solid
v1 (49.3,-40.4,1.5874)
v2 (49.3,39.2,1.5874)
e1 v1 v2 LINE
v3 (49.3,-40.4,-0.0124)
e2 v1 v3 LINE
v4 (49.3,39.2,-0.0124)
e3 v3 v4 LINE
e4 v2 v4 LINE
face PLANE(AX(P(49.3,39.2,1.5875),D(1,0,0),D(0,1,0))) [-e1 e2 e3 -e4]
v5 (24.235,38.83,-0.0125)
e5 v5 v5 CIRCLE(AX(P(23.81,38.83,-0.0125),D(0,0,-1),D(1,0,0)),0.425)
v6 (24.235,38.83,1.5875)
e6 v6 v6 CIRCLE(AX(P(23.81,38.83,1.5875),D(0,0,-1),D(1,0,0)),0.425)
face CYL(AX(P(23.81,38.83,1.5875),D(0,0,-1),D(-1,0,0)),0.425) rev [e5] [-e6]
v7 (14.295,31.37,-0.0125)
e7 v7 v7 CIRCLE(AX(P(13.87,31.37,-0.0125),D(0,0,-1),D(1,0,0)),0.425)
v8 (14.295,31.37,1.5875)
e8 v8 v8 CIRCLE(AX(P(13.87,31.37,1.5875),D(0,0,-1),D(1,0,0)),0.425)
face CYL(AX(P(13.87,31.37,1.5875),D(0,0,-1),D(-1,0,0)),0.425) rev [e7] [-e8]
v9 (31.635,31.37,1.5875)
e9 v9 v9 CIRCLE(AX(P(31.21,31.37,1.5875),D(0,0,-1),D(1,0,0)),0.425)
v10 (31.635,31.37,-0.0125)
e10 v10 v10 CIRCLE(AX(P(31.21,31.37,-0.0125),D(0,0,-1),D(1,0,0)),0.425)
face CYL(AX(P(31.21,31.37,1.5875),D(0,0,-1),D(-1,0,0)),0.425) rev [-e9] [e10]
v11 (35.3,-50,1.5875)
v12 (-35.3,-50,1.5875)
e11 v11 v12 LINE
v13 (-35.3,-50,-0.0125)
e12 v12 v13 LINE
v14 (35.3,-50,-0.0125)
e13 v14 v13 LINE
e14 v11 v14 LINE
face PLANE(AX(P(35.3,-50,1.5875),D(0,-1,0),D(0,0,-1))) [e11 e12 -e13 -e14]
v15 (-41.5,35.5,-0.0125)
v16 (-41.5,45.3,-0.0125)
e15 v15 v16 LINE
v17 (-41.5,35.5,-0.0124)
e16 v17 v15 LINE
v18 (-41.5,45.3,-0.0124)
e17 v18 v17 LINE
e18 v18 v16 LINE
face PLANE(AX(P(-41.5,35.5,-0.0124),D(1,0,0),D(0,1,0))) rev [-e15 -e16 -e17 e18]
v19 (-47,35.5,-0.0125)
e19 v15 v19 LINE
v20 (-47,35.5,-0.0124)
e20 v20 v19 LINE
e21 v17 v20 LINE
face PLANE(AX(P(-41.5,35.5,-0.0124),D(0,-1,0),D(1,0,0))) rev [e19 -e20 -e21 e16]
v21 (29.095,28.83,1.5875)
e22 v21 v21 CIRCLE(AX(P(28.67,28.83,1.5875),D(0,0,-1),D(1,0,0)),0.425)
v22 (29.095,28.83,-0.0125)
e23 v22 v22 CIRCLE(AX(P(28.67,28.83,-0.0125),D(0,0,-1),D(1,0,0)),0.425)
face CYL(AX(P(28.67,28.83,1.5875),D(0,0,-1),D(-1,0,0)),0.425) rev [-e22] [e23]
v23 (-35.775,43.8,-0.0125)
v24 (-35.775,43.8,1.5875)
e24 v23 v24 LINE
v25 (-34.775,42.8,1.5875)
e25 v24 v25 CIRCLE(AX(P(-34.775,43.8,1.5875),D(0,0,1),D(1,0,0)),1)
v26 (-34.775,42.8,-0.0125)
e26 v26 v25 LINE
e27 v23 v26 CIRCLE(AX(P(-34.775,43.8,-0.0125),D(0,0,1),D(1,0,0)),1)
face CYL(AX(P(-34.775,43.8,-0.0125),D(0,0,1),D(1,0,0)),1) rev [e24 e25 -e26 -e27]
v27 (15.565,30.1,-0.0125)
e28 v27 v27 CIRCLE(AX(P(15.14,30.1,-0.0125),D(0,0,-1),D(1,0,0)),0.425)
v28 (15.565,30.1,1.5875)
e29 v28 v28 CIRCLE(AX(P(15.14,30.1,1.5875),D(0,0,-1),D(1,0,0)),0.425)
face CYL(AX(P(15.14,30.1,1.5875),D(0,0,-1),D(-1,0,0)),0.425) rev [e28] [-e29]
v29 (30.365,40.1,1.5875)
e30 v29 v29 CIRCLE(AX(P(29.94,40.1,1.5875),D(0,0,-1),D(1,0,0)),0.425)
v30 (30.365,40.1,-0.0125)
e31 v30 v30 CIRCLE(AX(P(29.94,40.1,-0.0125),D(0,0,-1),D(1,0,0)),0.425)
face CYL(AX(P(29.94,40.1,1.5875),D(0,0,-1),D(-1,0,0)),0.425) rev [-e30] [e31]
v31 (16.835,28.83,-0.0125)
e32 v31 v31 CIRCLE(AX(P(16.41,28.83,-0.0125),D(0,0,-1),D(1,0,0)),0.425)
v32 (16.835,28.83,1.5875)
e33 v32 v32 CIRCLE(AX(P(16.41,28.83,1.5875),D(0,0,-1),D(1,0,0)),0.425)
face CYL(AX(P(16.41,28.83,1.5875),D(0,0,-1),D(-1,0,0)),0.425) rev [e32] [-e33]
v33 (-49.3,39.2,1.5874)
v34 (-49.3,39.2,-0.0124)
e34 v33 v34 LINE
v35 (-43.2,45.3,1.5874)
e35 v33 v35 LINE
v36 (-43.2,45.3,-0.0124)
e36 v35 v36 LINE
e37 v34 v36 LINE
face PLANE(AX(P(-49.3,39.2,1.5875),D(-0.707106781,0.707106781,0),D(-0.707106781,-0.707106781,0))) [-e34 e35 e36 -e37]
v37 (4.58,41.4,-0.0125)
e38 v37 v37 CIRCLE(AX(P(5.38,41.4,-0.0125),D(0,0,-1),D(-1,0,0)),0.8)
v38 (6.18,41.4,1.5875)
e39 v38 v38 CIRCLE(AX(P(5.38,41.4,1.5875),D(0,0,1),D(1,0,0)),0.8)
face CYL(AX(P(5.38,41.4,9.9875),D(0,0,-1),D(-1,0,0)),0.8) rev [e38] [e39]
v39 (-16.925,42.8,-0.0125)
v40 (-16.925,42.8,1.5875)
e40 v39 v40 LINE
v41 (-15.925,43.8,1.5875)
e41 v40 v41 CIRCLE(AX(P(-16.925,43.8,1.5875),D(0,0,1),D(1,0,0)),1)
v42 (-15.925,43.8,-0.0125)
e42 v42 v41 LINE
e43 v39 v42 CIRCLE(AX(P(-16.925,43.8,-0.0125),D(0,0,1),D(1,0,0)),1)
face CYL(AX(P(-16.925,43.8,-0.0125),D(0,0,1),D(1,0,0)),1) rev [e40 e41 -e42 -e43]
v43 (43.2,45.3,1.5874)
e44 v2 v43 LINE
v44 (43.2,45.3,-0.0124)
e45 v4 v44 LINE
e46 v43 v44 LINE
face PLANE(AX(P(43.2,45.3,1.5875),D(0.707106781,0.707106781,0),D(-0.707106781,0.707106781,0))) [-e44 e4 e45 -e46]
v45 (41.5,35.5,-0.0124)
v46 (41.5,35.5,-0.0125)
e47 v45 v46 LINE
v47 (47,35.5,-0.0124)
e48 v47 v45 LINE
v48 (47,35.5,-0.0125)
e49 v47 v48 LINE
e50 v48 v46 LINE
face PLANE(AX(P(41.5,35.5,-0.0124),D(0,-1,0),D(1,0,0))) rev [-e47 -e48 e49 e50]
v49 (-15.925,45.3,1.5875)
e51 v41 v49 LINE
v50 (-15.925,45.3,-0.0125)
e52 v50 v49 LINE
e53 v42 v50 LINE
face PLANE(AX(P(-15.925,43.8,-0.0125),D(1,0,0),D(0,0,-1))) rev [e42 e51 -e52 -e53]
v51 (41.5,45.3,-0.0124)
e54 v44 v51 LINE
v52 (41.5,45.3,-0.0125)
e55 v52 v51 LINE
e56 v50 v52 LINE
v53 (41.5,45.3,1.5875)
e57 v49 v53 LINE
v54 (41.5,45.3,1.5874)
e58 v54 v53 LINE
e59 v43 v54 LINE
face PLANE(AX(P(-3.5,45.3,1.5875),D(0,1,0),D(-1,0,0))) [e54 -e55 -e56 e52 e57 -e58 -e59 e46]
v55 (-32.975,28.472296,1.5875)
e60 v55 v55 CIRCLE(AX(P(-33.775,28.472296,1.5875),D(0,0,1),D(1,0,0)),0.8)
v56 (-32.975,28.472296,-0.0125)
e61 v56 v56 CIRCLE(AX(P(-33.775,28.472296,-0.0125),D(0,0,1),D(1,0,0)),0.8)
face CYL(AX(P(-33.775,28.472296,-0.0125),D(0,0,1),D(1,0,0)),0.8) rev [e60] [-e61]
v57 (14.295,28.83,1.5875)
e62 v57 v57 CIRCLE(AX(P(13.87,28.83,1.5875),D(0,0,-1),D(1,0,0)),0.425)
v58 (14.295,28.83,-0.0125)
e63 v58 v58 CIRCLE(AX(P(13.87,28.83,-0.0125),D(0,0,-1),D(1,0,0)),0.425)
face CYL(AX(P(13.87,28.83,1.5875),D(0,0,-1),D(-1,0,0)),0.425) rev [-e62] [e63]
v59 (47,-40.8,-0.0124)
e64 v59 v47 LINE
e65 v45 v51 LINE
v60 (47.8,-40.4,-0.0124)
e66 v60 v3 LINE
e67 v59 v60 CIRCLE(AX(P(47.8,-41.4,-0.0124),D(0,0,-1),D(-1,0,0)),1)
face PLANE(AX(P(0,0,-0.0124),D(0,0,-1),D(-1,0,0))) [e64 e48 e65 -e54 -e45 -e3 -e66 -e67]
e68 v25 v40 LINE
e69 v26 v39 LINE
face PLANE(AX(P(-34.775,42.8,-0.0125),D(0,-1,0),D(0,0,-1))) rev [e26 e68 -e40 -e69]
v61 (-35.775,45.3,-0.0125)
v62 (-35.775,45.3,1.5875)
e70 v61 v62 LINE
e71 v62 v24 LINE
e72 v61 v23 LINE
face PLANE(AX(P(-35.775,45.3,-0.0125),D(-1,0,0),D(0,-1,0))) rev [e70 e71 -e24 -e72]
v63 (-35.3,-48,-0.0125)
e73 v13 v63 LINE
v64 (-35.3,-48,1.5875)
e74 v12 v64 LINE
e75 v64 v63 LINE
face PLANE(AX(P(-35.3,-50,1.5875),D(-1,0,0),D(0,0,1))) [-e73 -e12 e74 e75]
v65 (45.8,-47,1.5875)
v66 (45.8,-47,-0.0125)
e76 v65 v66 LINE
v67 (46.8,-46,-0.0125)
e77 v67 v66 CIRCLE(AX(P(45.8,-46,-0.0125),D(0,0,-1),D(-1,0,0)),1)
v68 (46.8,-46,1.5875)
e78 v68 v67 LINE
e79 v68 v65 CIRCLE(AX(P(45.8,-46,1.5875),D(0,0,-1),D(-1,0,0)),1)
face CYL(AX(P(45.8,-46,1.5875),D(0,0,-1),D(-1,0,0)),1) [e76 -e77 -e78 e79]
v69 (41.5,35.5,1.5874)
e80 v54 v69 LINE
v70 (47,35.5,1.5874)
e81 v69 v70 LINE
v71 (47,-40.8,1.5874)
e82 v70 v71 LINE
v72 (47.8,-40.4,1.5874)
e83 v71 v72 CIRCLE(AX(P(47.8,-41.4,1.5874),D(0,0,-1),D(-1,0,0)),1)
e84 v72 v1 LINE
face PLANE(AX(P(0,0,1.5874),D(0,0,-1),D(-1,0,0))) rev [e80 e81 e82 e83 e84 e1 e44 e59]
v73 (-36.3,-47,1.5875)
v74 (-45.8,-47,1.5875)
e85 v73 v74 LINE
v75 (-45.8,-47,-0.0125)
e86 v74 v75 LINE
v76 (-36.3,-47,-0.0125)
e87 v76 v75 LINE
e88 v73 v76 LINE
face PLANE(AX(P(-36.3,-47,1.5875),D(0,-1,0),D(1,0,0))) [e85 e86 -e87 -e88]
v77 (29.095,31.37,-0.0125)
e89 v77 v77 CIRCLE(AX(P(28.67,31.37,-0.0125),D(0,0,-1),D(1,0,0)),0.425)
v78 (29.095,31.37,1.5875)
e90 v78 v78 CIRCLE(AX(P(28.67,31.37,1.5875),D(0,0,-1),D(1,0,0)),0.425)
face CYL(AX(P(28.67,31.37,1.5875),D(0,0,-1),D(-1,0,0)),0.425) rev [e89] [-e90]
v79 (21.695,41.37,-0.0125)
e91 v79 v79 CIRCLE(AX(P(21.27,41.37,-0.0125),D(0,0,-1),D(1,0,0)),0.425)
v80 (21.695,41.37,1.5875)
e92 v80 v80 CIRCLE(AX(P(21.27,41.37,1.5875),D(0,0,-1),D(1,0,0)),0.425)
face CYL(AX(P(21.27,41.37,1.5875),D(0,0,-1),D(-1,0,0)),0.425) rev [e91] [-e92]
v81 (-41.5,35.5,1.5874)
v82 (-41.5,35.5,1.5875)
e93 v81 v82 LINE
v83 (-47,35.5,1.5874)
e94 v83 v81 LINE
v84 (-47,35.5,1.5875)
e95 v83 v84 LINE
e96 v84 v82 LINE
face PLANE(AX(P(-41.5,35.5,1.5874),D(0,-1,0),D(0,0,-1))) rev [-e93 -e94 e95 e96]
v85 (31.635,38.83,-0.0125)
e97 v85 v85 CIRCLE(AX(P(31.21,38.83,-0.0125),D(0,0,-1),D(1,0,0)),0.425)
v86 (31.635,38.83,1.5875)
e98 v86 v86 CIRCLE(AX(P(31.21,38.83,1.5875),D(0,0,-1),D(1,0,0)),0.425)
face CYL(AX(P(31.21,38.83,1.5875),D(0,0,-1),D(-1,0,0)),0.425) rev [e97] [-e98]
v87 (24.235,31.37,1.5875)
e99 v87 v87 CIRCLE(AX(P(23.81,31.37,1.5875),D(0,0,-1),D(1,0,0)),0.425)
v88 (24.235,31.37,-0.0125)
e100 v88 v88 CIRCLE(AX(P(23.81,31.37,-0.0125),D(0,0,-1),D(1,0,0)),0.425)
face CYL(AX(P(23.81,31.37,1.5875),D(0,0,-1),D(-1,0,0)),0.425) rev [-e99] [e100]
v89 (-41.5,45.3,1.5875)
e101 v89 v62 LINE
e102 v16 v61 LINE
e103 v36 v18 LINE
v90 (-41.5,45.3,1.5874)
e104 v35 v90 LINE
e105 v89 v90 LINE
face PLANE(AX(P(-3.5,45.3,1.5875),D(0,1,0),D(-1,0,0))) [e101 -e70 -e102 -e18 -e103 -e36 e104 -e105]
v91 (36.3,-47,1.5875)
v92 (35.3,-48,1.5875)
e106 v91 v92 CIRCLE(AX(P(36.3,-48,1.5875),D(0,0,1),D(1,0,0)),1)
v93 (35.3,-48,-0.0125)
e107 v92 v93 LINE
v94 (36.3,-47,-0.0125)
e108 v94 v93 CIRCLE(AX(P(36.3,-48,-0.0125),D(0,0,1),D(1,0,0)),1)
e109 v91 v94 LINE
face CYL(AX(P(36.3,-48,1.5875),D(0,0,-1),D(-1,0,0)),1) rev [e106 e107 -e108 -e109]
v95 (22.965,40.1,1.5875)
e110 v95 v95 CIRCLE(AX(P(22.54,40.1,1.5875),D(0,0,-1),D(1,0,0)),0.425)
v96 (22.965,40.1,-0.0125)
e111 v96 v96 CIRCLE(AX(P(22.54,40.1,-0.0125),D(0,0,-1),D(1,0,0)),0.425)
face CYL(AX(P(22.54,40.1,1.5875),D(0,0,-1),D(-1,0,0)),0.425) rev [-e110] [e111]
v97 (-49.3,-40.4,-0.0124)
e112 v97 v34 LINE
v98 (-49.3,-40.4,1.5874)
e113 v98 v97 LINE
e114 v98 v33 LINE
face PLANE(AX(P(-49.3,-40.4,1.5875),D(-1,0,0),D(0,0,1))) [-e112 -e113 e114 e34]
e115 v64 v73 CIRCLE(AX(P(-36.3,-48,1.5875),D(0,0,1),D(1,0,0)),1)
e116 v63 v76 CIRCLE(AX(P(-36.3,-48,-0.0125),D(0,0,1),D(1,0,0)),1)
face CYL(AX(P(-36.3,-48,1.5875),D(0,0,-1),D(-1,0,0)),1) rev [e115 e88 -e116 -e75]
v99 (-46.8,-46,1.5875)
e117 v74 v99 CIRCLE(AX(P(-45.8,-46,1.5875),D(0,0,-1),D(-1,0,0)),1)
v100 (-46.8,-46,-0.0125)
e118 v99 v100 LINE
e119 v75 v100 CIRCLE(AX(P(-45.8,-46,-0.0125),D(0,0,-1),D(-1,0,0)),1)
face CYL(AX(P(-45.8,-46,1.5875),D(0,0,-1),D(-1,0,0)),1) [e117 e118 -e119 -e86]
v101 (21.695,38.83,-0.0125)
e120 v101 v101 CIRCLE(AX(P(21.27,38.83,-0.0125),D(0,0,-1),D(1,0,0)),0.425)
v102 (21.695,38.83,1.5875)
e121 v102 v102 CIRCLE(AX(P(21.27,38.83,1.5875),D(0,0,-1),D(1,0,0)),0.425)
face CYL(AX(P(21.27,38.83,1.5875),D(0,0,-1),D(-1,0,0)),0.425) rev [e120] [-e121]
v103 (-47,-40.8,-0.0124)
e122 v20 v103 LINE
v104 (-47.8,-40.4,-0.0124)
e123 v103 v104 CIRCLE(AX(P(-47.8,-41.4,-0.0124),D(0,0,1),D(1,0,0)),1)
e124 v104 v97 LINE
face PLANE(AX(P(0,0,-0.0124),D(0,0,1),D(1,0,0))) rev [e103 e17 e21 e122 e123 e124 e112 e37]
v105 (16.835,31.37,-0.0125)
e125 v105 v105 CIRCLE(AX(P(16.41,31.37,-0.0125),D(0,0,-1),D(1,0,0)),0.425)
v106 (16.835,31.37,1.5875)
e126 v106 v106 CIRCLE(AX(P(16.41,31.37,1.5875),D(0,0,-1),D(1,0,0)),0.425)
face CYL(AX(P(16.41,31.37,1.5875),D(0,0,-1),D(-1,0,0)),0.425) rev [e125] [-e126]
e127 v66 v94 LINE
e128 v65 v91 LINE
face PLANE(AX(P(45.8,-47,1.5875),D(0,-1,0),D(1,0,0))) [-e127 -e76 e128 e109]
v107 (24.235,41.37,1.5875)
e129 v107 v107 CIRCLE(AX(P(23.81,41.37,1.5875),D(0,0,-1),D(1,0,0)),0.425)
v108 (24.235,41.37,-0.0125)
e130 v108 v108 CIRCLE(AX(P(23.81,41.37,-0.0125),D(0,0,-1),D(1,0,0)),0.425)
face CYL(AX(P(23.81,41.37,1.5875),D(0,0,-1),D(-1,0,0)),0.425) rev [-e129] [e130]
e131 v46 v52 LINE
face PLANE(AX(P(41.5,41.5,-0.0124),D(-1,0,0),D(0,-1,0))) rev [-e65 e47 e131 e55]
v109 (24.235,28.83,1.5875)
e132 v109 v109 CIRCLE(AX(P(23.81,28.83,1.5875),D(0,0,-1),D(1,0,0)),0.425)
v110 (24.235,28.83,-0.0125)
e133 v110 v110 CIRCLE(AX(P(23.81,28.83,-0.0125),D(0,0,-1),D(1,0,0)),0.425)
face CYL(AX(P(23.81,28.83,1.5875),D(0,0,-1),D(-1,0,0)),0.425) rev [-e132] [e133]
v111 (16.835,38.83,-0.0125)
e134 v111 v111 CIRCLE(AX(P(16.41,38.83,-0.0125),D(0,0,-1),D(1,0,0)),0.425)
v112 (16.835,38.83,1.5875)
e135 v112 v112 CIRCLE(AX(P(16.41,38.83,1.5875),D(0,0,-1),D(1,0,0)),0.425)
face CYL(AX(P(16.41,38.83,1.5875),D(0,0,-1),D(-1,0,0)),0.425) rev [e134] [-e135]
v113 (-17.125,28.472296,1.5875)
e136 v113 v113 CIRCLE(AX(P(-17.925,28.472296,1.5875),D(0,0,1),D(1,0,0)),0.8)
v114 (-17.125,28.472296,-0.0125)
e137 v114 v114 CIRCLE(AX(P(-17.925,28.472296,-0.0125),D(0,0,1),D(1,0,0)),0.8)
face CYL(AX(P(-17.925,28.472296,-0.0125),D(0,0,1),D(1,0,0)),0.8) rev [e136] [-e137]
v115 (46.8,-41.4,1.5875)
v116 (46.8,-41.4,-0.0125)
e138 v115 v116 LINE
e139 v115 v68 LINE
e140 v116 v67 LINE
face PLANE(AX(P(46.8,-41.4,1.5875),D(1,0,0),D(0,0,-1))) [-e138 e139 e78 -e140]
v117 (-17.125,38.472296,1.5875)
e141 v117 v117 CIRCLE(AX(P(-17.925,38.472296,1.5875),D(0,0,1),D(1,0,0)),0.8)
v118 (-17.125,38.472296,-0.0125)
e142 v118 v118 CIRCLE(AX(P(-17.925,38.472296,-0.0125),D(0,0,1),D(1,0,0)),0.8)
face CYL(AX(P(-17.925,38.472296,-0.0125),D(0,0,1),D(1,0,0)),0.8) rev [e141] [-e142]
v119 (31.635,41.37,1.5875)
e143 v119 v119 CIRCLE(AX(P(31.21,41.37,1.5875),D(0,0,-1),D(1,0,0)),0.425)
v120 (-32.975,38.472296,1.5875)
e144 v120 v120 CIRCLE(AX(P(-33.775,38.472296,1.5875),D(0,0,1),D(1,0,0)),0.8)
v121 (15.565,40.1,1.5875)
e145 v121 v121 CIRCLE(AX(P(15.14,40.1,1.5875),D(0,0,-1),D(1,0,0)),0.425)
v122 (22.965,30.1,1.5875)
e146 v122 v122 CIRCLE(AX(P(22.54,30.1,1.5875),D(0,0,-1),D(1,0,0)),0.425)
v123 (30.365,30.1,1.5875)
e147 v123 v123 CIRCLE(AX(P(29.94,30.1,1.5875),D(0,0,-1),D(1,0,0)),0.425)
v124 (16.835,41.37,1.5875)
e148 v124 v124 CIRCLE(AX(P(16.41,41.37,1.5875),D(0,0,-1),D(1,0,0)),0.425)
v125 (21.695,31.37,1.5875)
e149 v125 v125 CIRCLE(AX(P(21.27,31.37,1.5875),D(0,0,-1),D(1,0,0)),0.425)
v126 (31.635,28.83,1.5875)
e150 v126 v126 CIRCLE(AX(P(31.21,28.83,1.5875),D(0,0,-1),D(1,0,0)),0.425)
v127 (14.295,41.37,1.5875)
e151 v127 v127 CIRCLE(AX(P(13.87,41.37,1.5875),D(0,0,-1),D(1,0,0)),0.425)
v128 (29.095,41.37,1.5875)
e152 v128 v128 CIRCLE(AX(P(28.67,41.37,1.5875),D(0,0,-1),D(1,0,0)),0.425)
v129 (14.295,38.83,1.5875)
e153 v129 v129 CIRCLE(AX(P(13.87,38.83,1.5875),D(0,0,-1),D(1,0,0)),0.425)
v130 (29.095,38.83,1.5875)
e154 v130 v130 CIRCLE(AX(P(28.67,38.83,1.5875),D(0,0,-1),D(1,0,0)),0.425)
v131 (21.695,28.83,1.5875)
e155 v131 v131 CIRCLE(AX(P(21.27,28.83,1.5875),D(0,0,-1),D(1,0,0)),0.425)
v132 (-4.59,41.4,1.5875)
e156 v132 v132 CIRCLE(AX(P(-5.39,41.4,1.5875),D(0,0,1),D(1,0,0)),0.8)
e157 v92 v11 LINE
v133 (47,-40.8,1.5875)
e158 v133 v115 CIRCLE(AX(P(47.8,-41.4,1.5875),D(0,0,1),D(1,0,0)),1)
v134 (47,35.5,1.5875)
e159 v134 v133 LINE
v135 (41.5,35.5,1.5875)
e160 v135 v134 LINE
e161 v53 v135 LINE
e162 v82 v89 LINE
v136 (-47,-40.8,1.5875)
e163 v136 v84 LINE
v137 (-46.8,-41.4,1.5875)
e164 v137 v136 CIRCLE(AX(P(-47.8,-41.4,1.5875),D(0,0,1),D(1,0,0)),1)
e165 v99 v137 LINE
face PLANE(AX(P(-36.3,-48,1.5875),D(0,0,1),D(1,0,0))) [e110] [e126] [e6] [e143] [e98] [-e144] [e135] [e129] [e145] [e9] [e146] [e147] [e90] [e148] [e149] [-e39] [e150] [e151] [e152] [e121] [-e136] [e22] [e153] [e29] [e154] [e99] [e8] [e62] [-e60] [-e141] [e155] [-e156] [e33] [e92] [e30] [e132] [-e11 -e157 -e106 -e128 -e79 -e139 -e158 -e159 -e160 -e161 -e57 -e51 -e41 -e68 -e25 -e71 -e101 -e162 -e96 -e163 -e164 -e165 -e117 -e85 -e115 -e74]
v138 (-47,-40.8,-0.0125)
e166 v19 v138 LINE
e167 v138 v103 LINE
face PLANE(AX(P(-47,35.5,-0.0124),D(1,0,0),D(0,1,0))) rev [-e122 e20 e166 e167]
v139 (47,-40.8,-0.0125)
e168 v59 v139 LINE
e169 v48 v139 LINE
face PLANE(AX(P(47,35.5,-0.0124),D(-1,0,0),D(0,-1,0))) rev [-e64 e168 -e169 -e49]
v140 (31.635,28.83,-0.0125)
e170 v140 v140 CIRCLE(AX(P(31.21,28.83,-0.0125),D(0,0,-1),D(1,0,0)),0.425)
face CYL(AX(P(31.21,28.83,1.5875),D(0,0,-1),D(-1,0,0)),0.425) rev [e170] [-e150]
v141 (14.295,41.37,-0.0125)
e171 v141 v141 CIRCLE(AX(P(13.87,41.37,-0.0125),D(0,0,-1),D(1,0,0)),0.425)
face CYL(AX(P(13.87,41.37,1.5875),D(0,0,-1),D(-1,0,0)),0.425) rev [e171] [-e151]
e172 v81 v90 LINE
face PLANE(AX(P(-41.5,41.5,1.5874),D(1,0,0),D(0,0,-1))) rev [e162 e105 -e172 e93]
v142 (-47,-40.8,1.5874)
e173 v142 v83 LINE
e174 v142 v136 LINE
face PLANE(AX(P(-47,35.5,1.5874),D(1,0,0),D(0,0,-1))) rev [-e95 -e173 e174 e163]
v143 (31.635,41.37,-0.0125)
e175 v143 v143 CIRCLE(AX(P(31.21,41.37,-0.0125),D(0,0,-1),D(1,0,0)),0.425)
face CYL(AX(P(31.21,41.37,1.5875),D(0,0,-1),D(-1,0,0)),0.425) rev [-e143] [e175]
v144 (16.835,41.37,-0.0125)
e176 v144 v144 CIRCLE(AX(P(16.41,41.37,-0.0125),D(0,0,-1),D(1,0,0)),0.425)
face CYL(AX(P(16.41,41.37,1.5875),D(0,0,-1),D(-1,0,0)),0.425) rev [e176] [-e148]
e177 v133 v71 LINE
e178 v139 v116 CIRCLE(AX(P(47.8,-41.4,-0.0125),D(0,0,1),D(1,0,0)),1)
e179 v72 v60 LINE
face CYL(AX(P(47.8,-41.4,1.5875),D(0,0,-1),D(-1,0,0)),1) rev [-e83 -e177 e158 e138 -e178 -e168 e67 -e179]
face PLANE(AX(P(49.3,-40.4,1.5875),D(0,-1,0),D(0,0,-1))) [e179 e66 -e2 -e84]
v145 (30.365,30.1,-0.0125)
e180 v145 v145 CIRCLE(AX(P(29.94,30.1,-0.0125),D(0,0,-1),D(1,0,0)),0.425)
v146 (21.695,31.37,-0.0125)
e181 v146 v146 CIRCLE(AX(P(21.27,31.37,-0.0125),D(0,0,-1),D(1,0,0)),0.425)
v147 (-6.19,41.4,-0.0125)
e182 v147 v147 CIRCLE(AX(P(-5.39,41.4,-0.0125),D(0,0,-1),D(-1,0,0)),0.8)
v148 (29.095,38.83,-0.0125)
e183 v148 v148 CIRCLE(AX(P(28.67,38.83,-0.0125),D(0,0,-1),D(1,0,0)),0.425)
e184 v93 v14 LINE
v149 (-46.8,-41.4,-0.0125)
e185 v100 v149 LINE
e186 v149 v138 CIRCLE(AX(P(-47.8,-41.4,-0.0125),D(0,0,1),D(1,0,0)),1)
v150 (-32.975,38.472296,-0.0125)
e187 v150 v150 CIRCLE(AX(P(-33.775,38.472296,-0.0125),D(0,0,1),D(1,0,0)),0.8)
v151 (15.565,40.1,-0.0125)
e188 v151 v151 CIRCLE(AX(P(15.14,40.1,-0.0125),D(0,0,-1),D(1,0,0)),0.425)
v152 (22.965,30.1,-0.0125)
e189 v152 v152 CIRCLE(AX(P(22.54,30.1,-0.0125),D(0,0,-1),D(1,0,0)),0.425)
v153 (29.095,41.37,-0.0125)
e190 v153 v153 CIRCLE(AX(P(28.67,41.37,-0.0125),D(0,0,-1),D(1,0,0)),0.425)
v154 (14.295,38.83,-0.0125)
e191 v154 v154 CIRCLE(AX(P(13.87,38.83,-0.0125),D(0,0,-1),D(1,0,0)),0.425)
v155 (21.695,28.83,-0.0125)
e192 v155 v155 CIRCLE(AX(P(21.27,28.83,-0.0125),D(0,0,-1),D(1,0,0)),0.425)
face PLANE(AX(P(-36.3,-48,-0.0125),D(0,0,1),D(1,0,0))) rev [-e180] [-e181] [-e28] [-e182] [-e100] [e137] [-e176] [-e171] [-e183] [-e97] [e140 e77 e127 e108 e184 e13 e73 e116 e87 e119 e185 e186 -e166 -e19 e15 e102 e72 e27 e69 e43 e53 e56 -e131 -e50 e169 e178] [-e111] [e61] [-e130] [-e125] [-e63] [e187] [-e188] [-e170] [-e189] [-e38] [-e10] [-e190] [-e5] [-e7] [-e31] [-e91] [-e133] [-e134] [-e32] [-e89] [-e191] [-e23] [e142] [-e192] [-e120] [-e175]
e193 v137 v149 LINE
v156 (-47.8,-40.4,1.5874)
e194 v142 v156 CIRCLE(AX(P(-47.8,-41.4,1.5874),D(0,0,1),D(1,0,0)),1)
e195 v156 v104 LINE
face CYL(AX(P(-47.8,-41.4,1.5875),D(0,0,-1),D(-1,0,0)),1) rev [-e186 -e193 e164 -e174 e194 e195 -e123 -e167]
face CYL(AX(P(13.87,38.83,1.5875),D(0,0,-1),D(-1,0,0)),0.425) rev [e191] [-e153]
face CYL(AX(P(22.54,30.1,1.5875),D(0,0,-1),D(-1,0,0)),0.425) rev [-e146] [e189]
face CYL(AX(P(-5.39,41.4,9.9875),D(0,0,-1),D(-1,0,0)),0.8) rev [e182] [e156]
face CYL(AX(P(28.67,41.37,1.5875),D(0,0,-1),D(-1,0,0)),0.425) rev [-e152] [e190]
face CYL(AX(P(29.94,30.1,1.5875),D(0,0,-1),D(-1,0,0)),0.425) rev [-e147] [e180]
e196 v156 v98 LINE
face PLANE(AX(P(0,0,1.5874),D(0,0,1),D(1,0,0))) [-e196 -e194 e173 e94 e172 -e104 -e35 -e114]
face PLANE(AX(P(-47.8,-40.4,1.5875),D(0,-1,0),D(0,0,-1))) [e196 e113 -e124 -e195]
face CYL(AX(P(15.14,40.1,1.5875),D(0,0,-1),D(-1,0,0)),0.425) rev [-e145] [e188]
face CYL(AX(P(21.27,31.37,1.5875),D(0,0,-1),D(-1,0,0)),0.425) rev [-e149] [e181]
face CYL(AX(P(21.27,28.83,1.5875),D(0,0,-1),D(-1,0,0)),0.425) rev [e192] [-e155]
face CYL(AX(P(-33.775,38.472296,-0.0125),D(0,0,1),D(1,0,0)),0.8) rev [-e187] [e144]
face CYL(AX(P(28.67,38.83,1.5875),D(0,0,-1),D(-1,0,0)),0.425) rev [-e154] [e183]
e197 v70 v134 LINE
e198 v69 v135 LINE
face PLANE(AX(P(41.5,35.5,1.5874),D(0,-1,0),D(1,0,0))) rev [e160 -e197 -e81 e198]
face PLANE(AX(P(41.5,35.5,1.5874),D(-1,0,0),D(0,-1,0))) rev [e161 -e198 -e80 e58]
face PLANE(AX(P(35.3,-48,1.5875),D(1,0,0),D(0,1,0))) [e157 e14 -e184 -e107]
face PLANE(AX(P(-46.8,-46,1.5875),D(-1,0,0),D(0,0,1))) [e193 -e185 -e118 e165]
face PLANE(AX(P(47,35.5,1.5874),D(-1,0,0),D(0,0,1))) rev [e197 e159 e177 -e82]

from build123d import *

# Parameters (mm, degrees)
SKETCH1_R                = 0.425
BOSS_EXTRUDE1_DEPTH      = 1.6
LPATTERN2_START          = -0.0125
LPATTERN2_OUTLINE_R      = 0.425
LPATTERN2_DEPTH          = 1.6
SLOTFOOTPRINTS_REF_DEPTH = 0.0001
SLOTFOOTPRINTS_DEPTH     = 0.0001
SKETCH2_R                = 0.8
F_20PIN_MOUNTS_DEPTH     = 71.235674696
SKETCH3_R                = 0.8
F_12PIN_MOUNTS_DEPTH     = 10


# Read off the part's stored shape, not the designer's step: LPattern2
with BuildPart() as part:
    # Sketch1 → Boss-Extrude1 (new body)
    with BuildSketch(Plane(origin=(0, 0, -0.0125), x_dir=(-1, 0, 0), z_dir=(0, 0, -1))):
        with BuildLine():
            Line((35.3, -50), (35.3, -48))
            ThreePointArc((35.3, -48), (35.592893219, -47.292893219), (36.3, -47))
            Line((36.3, -47), (45.8, -47))
            ThreePointArc((45.8, -47), (46.507106781, -46.707106781), (46.8, -46))
            Line((46.8, -46), (46.8, -41.4))
            ThreePointArc((46.8, -41.4), (47.092893219, -40.692893219), (47.8, -40.4))
            Line((47.8, -40.4), (49.3, -40.4))
            Line((49.3, -40.4), (49.3, 39.2))
            Line((49.3, 39.2), (43.2, 45.3))
            Line((43.2, 45.3), (35.500000002, 45.3))
            Line((35.500000002, 45.3), (3.499999998, 45.3))
            Line((3.499999998, 45.3), (-43.2, 45.3))
            Line((-43.2, 45.3), (-49.3, 39.2))
            Line((-49.3, 39.2), (-49.3, -40.4))
            Line((-49.3, -40.4), (-47.8, -40.4))
            ThreePointArc((-47.8, -40.4), (-47.092893219, -40.692893219), (-46.8, -41.4))
            Line((-46.8, -41.4), (-46.8, -46))
            ThreePointArc((-46.8, -46), (-46.507106781, -46.707106781), (-45.8, -47))
            Line((-45.8, -47), (-36.3, -47))
            ThreePointArc((-36.3, -47), (-35.592893219, -47.292893219), (-35.3, -48))
            Line((-35.3, -48), (-35.3, -50))
            Line((-35.3, -50), (35.3, -50))
        make_face()
        with Locations(Location((-21.27, 41.37, 0), (0, 0, 180))):
            Circle(SKETCH1_R, mode=Mode.SUBTRACT)
        with Locations(Location((-23.81, 41.37, 0), (0, 0, 180))):
            Circle(SKETCH1_R, mode=Mode.SUBTRACT)
        with Locations(Location((-22.54, 40.1, 0), (0, 0, 180))):
            Circle(SKETCH1_R, mode=Mode.SUBTRACT)
        with Locations(Location((-13.87, 41.37, 0), (0, 0, 180))):
            Circle(SKETCH1_R, mode=Mode.SUBTRACT)
        with Locations(Location((-23.81, 38.83, 0), (0, 0, 180))):
            Circle(SKETCH1_R, mode=Mode.SUBTRACT)
        with Locations(Location((-16.41, 41.37, 0), (0, 0, 180))):
            Circle(SKETCH1_R, mode=Mode.SUBTRACT)
        with Locations(Location((-15.14, 40.1, 0), (0, 0, 180))):
            Circle(SKETCH1_R, mode=Mode.SUBTRACT)
        with Locations(Location((-21.27, 38.83, 0), (0, 0, 180))):
            Circle(SKETCH1_R, mode=Mode.SUBTRACT)
        with Locations(Location((-28.67, 41.37, 0), (0, 0, 180))):
            Circle(SKETCH1_R, mode=Mode.SUBTRACT)
        with Locations(Location((-31.21, 41.37, 0), (0, 0, 180))):
            Circle(SKETCH1_R, mode=Mode.SUBTRACT)
        with Locations(Location((-16.41, 38.83, 0), (0, 0, 180))):
            Circle(SKETCH1_R, mode=Mode.SUBTRACT)
        with Locations(Location((-29.94, 40.1, 0), (0, 0, 180))):
            Circle(SKETCH1_R, mode=Mode.SUBTRACT)
        with Locations(Location((-31.21, 38.83, 0), (0, 0, 180))):
            Circle(SKETCH1_R, mode=Mode.SUBTRACT)
        with Locations(Location((-28.67, 38.83, 0), (0, 0, 180))):
            Circle(SKETCH1_R, mode=Mode.SUBTRACT)
        with Locations(Location((-13.87, 38.83, 0), (0, 0, 180))):
            Circle(SKETCH1_R, mode=Mode.SUBTRACT)
    extrude(amount=-BOSS_EXTRUDE1_DEPTH)

    # LPattern2 outline → LPattern2 (cut)
    with BuildSketch(Plane.XY.offset(LPATTERN2_START)):
        with Locations((31.21, 31.37)):
            Circle(LPATTERN2_OUTLINE_R)
        with Locations((31.21, 28.83)):
            Circle(LPATTERN2_OUTLINE_R)
        with Locations((29.94, 30.1)):
            Circle(LPATTERN2_OUTLINE_R)
        with Locations((28.67, 28.83)):
            Circle(LPATTERN2_OUTLINE_R)
        with Locations((28.67, 31.37)):
            Circle(LPATTERN2_OUTLINE_R)
        with Locations((16.41, 31.37)):
            Circle(LPATTERN2_OUTLINE_R)
        with Locations((23.81, 31.37)):
            Circle(LPATTERN2_OUTLINE_R)
        with Locations((23.81, 28.83)):
            Circle(LPATTERN2_OUTLINE_R)
        with Locations((22.54, 30.1)):
            Circle(LPATTERN2_OUTLINE_R)
        with Locations((21.27, 28.83)):
            Circle(LPATTERN2_OUTLINE_R)
        with Locations((21.27, 31.37)):
            Circle(LPATTERN2_OUTLINE_R)
        with Locations((16.41, 28.83)):
            Circle(LPATTERN2_OUTLINE_R)
        with Locations((15.14, 30.1)):
            Circle(LPATTERN2_OUTLINE_R)
        with Locations((13.87, 28.83)):
            Circle(LPATTERN2_OUTLINE_R)
        with Locations((13.87, 31.37)):
            Circle(LPATTERN2_OUTLINE_R)
    extrude(amount=LPATTERN2_DEPTH, mode=Mode.SUBTRACT)

    # thermalContacts_lower → slotFootprints_REF (cut)
    with BuildSketch(Plane(origin=(0, 0, -0.0125), x_dir=(-1, 0, 0), z_dir=(0, 0, -1))):
        Polygon((47, 35.5), (47, -41.5), (59.827263463, -41.5), (59.827263463, 47), (41.5, 47), (41.5, 41.5), (41.5, 35.5), align=None)
        Polygon((-47, 35.5), (-47, -41.5), (-56.192158269, -41.5), (-56.192158269, 47), (-41.5, 47), (-41.5, 41.5), (-41.5, 35.5), align=None)
    extrude(amount=-SLOTFOOTPRINTS_REF_DEPTH, mode=Mode.SUBTRACT)

    # thermalContacts_upper → slotFootprints (cut)
    with BuildSketch(Plane.XY.offset(1.5875)):
        Polygon((-47, 35.5), (-47, -41.5), (-56.192158269, -41.5), (-56.192158269, 47), (-41.5, 47), (-41.5, 41.5), (-41.5, 35.5), align=None)
        Polygon((47, 35.5), (47, -41.5), (59.827263463, -41.5), (59.827263463, 47), (41.5, 47), (41.5, 41.5), (41.5, 35.5), align=None)
    extrude(amount=-SLOTFOOTPRINTS_DEPTH, mode=Mode.SUBTRACT)

    # Sketch2 → 20pin_mounts (cut, through all)
    with BuildSketch(Plane.XY.offset(1.5875)):
        with Locations((-33.775, 38.472296419)):
            Circle(SKETCH2_R)
        with Locations((-17.925, 38.472296419)):
            Circle(SKETCH2_R)
        with Locations((-17.925, 28.472296419)):
            Circle(SKETCH2_R)
        with Locations((-33.775, 28.472296419)):
            Circle(SKETCH2_R)
        with BuildLine():
            Line((-35.775, 45.3), (-35.775, 43.8))
            ThreePointArc((-35.775, 43.8), (-35.482106781, 43.092893219), (-34.775, 42.8))
            Line((-34.775, 42.8), (-16.925, 42.8))
            ThreePointArc((-16.925, 42.8), (-16.217893218, 43.092893219), (-15.925, 43.8))
            Line((-15.925, 43.8), (-15.925, 45.3))
            Line((-15.925, 45.3), (-35.775, 45.3))
        make_face()
    extrude(amount=-F_20PIN_MOUNTS_DEPTH, mode=Mode.SUBTRACT)

    # Sketch3 → 12pin_mounts (cut)
    with BuildSketch(Plane(origin=(0, 0, -0.0125), x_dir=(-1, 0, 0), z_dir=(0, 0, -1))):
        with Locations((5.390000006, 41.4)):
            Circle(SKETCH3_R)
        with Locations((-5.379999994, 41.4)):
            Circle(SKETCH3_R)
    extrude(amount=-F_12PIN_MOUNTS_DEPTH, mode=Mode.SUBTRACT)


solid = part.part
